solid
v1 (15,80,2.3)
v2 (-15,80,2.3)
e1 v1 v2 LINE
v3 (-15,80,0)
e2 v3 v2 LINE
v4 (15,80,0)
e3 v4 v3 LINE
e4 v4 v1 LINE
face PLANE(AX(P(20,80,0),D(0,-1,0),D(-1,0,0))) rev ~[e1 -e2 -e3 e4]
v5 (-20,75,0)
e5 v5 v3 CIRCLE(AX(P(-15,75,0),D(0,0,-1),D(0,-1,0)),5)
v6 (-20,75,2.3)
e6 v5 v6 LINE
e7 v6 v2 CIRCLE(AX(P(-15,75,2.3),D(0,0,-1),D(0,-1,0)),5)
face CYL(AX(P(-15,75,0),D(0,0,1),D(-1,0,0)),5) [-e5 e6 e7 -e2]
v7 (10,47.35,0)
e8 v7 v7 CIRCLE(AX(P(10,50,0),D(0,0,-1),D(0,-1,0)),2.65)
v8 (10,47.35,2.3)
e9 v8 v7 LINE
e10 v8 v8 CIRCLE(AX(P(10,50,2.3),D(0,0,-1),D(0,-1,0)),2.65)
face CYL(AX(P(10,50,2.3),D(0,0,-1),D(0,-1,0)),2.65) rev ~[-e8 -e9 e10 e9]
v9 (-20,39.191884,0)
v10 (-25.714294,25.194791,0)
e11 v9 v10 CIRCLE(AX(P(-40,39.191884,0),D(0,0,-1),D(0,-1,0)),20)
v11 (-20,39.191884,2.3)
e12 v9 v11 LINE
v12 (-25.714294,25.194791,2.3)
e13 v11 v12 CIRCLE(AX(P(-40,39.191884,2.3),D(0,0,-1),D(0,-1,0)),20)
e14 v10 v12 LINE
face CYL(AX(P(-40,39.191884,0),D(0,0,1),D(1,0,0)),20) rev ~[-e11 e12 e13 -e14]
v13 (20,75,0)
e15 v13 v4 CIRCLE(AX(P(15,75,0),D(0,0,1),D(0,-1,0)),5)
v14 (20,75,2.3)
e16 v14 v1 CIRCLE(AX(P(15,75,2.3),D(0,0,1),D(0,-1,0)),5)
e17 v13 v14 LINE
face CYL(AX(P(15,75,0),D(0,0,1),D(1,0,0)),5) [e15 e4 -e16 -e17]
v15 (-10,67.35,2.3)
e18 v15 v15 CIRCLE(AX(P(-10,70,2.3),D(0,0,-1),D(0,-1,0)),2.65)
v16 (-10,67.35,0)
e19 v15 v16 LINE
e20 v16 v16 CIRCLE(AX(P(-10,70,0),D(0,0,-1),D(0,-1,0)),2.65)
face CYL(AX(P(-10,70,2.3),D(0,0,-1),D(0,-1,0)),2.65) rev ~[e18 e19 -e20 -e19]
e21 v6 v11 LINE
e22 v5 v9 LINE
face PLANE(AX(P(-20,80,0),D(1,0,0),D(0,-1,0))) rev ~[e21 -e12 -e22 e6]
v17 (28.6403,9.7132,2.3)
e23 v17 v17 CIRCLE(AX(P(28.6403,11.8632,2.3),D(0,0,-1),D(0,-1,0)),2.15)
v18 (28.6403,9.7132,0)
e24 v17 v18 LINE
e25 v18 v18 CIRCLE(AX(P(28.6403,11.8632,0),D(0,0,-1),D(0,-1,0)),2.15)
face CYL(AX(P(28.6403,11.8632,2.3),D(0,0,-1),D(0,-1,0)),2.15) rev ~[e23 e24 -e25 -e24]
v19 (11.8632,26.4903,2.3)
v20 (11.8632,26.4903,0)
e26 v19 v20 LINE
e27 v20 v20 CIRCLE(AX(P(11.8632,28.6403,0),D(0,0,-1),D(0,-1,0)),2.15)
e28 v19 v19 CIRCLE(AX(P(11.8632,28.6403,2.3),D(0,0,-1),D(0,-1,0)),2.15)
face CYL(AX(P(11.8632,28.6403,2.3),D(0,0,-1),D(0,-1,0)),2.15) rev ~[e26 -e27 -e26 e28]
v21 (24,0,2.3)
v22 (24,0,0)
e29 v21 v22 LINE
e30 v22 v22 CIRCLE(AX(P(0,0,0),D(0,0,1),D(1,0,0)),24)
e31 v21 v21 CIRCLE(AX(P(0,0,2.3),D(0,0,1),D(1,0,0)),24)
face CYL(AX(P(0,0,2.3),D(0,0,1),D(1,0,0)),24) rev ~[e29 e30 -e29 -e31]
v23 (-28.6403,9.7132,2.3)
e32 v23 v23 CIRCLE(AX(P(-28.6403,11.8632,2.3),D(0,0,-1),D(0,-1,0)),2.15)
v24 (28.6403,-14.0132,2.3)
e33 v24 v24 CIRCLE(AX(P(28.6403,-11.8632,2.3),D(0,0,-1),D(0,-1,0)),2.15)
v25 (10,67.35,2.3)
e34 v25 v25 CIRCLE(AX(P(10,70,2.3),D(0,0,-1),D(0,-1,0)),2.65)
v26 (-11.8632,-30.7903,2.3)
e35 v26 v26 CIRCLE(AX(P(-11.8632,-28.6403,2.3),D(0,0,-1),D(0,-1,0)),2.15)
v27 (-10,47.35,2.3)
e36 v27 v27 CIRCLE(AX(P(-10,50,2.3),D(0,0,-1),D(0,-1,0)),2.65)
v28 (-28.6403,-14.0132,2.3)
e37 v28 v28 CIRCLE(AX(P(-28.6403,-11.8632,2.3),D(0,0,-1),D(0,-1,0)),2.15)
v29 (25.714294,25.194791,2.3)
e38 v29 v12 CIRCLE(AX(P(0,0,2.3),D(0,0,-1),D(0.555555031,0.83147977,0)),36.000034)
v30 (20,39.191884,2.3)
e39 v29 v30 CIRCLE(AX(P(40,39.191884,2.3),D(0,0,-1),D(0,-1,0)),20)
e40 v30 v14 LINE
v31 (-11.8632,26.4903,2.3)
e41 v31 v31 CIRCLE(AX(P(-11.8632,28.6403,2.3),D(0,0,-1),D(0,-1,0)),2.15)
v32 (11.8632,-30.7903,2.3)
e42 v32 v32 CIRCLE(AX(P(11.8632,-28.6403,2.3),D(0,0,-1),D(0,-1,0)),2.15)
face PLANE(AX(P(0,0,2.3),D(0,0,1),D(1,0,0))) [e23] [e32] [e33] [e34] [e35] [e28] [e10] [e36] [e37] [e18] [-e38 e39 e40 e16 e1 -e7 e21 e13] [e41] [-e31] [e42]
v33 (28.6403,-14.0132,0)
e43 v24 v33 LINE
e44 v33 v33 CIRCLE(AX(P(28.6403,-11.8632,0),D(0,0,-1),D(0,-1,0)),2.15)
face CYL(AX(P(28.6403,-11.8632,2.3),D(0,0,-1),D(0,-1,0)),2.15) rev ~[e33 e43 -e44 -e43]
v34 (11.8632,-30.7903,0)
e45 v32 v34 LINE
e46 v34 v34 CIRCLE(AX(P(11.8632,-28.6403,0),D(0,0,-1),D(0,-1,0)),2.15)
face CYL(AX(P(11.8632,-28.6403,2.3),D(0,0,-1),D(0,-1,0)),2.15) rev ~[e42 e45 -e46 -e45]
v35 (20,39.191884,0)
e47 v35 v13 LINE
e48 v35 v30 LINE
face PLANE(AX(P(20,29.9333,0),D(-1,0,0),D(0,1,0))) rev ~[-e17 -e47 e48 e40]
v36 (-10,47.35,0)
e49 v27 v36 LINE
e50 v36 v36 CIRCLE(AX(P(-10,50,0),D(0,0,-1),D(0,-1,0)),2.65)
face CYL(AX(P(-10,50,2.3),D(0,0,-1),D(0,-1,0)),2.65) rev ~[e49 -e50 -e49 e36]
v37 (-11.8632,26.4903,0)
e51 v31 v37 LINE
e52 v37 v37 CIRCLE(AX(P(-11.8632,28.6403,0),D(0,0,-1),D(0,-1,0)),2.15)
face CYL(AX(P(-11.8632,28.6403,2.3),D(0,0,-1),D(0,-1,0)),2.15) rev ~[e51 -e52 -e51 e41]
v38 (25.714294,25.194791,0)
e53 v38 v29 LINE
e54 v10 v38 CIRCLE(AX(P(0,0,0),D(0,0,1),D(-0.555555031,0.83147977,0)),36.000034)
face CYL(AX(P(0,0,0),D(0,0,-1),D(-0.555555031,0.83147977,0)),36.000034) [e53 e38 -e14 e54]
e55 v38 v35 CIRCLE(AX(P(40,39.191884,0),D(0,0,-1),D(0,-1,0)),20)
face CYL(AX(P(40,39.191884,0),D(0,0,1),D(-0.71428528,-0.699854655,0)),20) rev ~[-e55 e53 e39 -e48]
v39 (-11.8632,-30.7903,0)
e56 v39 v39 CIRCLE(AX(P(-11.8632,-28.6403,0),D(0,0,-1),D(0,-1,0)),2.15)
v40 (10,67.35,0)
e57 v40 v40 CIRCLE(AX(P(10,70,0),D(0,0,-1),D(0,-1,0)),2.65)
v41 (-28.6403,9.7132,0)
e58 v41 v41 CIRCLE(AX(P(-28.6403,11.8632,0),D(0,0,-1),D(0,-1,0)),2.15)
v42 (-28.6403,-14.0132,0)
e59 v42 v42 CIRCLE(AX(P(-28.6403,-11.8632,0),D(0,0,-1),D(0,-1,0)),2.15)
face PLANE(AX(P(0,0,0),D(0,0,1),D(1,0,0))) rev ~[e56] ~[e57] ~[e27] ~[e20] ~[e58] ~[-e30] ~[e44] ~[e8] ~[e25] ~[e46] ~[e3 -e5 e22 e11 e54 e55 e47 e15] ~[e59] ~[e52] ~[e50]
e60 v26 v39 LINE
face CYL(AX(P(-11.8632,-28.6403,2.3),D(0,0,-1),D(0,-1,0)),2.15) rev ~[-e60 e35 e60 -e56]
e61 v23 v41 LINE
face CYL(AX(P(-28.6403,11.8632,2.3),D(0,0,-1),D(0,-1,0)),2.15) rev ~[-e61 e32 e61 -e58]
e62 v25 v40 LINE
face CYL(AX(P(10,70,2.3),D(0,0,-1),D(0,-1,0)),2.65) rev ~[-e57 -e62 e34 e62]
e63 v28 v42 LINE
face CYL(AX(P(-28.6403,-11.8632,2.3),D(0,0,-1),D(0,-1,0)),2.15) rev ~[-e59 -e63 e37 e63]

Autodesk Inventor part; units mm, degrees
ref_plane "YZ Plane" through (0, 0, 0) normal (1, 0, 0) x (0, 1, 0)
ref_plane "XZ Plane" through (0, 0, 0) normal (0, 1, 0) x (-1, 0, 0)
ref_plane "XY Plane" through (0, 0, 0) normal (0, 0, 1) x (1, 0, 0)
sketch "スケッチ1" plane through (0, 0, 0) normal (0, 0, 1) x (1, 0, 0)
  arc A0 (-20, 29.9333) -> (20, 29.9333) centre (0, 0) ccw
  line L0 (-20, -80) -> (20, -80)
  line L1 (20, -80) -> (20, 80)
  line L2 (20, 80) -> (-20, 80)
  line L3 (-20, 80) -> (-20, -80)
  line L4 (-20, -80) -> (20, 80) construction
  line L5 (20, -80) -> (-20, 80) construction
  dimension "d0" = 72
  dimension "d1" = 80
  dimension "d2" = 40
extrude "プレート1" add sketch "スケッチ1" along normal blind 2.3 contours L3 A0 | L3 L2 L1 A0 | L1 A0
sketch "スケッチ2" plane through (0, 0, 2.3) normal (0, 0, 1) x (1, 0, 0)
  circle A0 centre (0, 0) radius 31
  point P0 (-28.6403, -11.8632)
  point P1 (-11.8632, -28.6403)
  point P2 (11.8632, -28.6403)
  point P3 (28.6403, -11.8632)
  point P4 (28.6403, 11.8632)
  point P5 (11.8632, 28.6403)
  point P6 (-11.8632, 28.6403)
  point P7 (-28.6403, 11.8632)
  dimension "d5" = 62
  dimension "d8" = 360
  dimension "d34" = 0
hole "穴1" at (-28.6403, 11.8632, 2.3) at (-11.8632, 28.6403, 2.3) at (11.8632, 28.6403, 2.3) at (28.6403, 11.8632, 2.3) at (28.6403, -11.8632, 2.3) at (11.8632, -28.6403, 2.3) at (-11.8632, -28.6403, 2.3) at (-28.6403, -11.8632, 2.3) direction (0, 0, -1) diameter 4.3 end through all clearance for "Socket Head Cap Screw" size "M4" standard "Ansi Metric M Profile"
sketch "スケッチ4" plane through (0, 0, 2.3) normal (0, 0, 1) x (1, 0, 0)
  line L0 (10, 50) -> (-10, 50)
  line L1 (-10, 50) -> (-10, 70)
  line L2 (-10, 70) -> (10, 70)
  line L3 (10, 70) -> (10, 50)
  line L4 (10, 50) -> (-10, 70) construction
  line L5 (-10, 50) -> (10, 70) construction
  line L6 (-20, 80) -> (20, 80) projected
  circle A0 centre (0, 0) radius 72.5
  point P0 (0, 60)
  point P1 (0, 60)
  dimension "d21" = 20
  dimension "d22" = 10
  dimension "d33" = 145
  dimension "d38" = 20
hole "穴2" at (-10, 70, 2.3) at (10, 70, 2.3) at (-10, 50, 2.3) at (10, 50, 2.3) direction (0, 0, -1) diameter 5.3 end through all clearance for "Socket Head Cap Screw" size "M5" standard "Ansi Metric M Profile"
fillet "コーナーR2" radius 5 2 edges at (-20, 80, 1.15) (20, 80, 1.15)
sketch "スケッチ5" plane through (0, 0, 2.3) normal (0, 0, 1) x (1, 0, 0)
  circle A0 centre (0, 0) radius 24
  dimension "d35" = 48
extrude "押し出し2" cut sketch "スケッチ5" against normal blind 10
fillet "コーナーR3" radius 20 2 edges at (20, 29.9333, 1.15) (-20, 29.9333, 1.15)
equation "\"d16\" = Thickness"
equation "\"d3\" = Thickness"
equation "\"BendRadius\" = Thickness"
equation "\"BendReliefWidth\" = Thickness"
equation "\"BendReliefDepth\" = 0.5 * Thickness"
equation "\"CornerReliefSize\" = 4 * Thickness"
equation "\"MinimumRemnant\" = 2 * Thickness"
equation "\"TransitionRadius\" = BendRadius"
equation "\"JacobiRadiusSize\" = BendRadius"
equation "\"GapSize\" = Thickness"
equation "\"Thickness\" = 2.3"
properties part number "scara-plate8" material "鋼、炭素鋼"
